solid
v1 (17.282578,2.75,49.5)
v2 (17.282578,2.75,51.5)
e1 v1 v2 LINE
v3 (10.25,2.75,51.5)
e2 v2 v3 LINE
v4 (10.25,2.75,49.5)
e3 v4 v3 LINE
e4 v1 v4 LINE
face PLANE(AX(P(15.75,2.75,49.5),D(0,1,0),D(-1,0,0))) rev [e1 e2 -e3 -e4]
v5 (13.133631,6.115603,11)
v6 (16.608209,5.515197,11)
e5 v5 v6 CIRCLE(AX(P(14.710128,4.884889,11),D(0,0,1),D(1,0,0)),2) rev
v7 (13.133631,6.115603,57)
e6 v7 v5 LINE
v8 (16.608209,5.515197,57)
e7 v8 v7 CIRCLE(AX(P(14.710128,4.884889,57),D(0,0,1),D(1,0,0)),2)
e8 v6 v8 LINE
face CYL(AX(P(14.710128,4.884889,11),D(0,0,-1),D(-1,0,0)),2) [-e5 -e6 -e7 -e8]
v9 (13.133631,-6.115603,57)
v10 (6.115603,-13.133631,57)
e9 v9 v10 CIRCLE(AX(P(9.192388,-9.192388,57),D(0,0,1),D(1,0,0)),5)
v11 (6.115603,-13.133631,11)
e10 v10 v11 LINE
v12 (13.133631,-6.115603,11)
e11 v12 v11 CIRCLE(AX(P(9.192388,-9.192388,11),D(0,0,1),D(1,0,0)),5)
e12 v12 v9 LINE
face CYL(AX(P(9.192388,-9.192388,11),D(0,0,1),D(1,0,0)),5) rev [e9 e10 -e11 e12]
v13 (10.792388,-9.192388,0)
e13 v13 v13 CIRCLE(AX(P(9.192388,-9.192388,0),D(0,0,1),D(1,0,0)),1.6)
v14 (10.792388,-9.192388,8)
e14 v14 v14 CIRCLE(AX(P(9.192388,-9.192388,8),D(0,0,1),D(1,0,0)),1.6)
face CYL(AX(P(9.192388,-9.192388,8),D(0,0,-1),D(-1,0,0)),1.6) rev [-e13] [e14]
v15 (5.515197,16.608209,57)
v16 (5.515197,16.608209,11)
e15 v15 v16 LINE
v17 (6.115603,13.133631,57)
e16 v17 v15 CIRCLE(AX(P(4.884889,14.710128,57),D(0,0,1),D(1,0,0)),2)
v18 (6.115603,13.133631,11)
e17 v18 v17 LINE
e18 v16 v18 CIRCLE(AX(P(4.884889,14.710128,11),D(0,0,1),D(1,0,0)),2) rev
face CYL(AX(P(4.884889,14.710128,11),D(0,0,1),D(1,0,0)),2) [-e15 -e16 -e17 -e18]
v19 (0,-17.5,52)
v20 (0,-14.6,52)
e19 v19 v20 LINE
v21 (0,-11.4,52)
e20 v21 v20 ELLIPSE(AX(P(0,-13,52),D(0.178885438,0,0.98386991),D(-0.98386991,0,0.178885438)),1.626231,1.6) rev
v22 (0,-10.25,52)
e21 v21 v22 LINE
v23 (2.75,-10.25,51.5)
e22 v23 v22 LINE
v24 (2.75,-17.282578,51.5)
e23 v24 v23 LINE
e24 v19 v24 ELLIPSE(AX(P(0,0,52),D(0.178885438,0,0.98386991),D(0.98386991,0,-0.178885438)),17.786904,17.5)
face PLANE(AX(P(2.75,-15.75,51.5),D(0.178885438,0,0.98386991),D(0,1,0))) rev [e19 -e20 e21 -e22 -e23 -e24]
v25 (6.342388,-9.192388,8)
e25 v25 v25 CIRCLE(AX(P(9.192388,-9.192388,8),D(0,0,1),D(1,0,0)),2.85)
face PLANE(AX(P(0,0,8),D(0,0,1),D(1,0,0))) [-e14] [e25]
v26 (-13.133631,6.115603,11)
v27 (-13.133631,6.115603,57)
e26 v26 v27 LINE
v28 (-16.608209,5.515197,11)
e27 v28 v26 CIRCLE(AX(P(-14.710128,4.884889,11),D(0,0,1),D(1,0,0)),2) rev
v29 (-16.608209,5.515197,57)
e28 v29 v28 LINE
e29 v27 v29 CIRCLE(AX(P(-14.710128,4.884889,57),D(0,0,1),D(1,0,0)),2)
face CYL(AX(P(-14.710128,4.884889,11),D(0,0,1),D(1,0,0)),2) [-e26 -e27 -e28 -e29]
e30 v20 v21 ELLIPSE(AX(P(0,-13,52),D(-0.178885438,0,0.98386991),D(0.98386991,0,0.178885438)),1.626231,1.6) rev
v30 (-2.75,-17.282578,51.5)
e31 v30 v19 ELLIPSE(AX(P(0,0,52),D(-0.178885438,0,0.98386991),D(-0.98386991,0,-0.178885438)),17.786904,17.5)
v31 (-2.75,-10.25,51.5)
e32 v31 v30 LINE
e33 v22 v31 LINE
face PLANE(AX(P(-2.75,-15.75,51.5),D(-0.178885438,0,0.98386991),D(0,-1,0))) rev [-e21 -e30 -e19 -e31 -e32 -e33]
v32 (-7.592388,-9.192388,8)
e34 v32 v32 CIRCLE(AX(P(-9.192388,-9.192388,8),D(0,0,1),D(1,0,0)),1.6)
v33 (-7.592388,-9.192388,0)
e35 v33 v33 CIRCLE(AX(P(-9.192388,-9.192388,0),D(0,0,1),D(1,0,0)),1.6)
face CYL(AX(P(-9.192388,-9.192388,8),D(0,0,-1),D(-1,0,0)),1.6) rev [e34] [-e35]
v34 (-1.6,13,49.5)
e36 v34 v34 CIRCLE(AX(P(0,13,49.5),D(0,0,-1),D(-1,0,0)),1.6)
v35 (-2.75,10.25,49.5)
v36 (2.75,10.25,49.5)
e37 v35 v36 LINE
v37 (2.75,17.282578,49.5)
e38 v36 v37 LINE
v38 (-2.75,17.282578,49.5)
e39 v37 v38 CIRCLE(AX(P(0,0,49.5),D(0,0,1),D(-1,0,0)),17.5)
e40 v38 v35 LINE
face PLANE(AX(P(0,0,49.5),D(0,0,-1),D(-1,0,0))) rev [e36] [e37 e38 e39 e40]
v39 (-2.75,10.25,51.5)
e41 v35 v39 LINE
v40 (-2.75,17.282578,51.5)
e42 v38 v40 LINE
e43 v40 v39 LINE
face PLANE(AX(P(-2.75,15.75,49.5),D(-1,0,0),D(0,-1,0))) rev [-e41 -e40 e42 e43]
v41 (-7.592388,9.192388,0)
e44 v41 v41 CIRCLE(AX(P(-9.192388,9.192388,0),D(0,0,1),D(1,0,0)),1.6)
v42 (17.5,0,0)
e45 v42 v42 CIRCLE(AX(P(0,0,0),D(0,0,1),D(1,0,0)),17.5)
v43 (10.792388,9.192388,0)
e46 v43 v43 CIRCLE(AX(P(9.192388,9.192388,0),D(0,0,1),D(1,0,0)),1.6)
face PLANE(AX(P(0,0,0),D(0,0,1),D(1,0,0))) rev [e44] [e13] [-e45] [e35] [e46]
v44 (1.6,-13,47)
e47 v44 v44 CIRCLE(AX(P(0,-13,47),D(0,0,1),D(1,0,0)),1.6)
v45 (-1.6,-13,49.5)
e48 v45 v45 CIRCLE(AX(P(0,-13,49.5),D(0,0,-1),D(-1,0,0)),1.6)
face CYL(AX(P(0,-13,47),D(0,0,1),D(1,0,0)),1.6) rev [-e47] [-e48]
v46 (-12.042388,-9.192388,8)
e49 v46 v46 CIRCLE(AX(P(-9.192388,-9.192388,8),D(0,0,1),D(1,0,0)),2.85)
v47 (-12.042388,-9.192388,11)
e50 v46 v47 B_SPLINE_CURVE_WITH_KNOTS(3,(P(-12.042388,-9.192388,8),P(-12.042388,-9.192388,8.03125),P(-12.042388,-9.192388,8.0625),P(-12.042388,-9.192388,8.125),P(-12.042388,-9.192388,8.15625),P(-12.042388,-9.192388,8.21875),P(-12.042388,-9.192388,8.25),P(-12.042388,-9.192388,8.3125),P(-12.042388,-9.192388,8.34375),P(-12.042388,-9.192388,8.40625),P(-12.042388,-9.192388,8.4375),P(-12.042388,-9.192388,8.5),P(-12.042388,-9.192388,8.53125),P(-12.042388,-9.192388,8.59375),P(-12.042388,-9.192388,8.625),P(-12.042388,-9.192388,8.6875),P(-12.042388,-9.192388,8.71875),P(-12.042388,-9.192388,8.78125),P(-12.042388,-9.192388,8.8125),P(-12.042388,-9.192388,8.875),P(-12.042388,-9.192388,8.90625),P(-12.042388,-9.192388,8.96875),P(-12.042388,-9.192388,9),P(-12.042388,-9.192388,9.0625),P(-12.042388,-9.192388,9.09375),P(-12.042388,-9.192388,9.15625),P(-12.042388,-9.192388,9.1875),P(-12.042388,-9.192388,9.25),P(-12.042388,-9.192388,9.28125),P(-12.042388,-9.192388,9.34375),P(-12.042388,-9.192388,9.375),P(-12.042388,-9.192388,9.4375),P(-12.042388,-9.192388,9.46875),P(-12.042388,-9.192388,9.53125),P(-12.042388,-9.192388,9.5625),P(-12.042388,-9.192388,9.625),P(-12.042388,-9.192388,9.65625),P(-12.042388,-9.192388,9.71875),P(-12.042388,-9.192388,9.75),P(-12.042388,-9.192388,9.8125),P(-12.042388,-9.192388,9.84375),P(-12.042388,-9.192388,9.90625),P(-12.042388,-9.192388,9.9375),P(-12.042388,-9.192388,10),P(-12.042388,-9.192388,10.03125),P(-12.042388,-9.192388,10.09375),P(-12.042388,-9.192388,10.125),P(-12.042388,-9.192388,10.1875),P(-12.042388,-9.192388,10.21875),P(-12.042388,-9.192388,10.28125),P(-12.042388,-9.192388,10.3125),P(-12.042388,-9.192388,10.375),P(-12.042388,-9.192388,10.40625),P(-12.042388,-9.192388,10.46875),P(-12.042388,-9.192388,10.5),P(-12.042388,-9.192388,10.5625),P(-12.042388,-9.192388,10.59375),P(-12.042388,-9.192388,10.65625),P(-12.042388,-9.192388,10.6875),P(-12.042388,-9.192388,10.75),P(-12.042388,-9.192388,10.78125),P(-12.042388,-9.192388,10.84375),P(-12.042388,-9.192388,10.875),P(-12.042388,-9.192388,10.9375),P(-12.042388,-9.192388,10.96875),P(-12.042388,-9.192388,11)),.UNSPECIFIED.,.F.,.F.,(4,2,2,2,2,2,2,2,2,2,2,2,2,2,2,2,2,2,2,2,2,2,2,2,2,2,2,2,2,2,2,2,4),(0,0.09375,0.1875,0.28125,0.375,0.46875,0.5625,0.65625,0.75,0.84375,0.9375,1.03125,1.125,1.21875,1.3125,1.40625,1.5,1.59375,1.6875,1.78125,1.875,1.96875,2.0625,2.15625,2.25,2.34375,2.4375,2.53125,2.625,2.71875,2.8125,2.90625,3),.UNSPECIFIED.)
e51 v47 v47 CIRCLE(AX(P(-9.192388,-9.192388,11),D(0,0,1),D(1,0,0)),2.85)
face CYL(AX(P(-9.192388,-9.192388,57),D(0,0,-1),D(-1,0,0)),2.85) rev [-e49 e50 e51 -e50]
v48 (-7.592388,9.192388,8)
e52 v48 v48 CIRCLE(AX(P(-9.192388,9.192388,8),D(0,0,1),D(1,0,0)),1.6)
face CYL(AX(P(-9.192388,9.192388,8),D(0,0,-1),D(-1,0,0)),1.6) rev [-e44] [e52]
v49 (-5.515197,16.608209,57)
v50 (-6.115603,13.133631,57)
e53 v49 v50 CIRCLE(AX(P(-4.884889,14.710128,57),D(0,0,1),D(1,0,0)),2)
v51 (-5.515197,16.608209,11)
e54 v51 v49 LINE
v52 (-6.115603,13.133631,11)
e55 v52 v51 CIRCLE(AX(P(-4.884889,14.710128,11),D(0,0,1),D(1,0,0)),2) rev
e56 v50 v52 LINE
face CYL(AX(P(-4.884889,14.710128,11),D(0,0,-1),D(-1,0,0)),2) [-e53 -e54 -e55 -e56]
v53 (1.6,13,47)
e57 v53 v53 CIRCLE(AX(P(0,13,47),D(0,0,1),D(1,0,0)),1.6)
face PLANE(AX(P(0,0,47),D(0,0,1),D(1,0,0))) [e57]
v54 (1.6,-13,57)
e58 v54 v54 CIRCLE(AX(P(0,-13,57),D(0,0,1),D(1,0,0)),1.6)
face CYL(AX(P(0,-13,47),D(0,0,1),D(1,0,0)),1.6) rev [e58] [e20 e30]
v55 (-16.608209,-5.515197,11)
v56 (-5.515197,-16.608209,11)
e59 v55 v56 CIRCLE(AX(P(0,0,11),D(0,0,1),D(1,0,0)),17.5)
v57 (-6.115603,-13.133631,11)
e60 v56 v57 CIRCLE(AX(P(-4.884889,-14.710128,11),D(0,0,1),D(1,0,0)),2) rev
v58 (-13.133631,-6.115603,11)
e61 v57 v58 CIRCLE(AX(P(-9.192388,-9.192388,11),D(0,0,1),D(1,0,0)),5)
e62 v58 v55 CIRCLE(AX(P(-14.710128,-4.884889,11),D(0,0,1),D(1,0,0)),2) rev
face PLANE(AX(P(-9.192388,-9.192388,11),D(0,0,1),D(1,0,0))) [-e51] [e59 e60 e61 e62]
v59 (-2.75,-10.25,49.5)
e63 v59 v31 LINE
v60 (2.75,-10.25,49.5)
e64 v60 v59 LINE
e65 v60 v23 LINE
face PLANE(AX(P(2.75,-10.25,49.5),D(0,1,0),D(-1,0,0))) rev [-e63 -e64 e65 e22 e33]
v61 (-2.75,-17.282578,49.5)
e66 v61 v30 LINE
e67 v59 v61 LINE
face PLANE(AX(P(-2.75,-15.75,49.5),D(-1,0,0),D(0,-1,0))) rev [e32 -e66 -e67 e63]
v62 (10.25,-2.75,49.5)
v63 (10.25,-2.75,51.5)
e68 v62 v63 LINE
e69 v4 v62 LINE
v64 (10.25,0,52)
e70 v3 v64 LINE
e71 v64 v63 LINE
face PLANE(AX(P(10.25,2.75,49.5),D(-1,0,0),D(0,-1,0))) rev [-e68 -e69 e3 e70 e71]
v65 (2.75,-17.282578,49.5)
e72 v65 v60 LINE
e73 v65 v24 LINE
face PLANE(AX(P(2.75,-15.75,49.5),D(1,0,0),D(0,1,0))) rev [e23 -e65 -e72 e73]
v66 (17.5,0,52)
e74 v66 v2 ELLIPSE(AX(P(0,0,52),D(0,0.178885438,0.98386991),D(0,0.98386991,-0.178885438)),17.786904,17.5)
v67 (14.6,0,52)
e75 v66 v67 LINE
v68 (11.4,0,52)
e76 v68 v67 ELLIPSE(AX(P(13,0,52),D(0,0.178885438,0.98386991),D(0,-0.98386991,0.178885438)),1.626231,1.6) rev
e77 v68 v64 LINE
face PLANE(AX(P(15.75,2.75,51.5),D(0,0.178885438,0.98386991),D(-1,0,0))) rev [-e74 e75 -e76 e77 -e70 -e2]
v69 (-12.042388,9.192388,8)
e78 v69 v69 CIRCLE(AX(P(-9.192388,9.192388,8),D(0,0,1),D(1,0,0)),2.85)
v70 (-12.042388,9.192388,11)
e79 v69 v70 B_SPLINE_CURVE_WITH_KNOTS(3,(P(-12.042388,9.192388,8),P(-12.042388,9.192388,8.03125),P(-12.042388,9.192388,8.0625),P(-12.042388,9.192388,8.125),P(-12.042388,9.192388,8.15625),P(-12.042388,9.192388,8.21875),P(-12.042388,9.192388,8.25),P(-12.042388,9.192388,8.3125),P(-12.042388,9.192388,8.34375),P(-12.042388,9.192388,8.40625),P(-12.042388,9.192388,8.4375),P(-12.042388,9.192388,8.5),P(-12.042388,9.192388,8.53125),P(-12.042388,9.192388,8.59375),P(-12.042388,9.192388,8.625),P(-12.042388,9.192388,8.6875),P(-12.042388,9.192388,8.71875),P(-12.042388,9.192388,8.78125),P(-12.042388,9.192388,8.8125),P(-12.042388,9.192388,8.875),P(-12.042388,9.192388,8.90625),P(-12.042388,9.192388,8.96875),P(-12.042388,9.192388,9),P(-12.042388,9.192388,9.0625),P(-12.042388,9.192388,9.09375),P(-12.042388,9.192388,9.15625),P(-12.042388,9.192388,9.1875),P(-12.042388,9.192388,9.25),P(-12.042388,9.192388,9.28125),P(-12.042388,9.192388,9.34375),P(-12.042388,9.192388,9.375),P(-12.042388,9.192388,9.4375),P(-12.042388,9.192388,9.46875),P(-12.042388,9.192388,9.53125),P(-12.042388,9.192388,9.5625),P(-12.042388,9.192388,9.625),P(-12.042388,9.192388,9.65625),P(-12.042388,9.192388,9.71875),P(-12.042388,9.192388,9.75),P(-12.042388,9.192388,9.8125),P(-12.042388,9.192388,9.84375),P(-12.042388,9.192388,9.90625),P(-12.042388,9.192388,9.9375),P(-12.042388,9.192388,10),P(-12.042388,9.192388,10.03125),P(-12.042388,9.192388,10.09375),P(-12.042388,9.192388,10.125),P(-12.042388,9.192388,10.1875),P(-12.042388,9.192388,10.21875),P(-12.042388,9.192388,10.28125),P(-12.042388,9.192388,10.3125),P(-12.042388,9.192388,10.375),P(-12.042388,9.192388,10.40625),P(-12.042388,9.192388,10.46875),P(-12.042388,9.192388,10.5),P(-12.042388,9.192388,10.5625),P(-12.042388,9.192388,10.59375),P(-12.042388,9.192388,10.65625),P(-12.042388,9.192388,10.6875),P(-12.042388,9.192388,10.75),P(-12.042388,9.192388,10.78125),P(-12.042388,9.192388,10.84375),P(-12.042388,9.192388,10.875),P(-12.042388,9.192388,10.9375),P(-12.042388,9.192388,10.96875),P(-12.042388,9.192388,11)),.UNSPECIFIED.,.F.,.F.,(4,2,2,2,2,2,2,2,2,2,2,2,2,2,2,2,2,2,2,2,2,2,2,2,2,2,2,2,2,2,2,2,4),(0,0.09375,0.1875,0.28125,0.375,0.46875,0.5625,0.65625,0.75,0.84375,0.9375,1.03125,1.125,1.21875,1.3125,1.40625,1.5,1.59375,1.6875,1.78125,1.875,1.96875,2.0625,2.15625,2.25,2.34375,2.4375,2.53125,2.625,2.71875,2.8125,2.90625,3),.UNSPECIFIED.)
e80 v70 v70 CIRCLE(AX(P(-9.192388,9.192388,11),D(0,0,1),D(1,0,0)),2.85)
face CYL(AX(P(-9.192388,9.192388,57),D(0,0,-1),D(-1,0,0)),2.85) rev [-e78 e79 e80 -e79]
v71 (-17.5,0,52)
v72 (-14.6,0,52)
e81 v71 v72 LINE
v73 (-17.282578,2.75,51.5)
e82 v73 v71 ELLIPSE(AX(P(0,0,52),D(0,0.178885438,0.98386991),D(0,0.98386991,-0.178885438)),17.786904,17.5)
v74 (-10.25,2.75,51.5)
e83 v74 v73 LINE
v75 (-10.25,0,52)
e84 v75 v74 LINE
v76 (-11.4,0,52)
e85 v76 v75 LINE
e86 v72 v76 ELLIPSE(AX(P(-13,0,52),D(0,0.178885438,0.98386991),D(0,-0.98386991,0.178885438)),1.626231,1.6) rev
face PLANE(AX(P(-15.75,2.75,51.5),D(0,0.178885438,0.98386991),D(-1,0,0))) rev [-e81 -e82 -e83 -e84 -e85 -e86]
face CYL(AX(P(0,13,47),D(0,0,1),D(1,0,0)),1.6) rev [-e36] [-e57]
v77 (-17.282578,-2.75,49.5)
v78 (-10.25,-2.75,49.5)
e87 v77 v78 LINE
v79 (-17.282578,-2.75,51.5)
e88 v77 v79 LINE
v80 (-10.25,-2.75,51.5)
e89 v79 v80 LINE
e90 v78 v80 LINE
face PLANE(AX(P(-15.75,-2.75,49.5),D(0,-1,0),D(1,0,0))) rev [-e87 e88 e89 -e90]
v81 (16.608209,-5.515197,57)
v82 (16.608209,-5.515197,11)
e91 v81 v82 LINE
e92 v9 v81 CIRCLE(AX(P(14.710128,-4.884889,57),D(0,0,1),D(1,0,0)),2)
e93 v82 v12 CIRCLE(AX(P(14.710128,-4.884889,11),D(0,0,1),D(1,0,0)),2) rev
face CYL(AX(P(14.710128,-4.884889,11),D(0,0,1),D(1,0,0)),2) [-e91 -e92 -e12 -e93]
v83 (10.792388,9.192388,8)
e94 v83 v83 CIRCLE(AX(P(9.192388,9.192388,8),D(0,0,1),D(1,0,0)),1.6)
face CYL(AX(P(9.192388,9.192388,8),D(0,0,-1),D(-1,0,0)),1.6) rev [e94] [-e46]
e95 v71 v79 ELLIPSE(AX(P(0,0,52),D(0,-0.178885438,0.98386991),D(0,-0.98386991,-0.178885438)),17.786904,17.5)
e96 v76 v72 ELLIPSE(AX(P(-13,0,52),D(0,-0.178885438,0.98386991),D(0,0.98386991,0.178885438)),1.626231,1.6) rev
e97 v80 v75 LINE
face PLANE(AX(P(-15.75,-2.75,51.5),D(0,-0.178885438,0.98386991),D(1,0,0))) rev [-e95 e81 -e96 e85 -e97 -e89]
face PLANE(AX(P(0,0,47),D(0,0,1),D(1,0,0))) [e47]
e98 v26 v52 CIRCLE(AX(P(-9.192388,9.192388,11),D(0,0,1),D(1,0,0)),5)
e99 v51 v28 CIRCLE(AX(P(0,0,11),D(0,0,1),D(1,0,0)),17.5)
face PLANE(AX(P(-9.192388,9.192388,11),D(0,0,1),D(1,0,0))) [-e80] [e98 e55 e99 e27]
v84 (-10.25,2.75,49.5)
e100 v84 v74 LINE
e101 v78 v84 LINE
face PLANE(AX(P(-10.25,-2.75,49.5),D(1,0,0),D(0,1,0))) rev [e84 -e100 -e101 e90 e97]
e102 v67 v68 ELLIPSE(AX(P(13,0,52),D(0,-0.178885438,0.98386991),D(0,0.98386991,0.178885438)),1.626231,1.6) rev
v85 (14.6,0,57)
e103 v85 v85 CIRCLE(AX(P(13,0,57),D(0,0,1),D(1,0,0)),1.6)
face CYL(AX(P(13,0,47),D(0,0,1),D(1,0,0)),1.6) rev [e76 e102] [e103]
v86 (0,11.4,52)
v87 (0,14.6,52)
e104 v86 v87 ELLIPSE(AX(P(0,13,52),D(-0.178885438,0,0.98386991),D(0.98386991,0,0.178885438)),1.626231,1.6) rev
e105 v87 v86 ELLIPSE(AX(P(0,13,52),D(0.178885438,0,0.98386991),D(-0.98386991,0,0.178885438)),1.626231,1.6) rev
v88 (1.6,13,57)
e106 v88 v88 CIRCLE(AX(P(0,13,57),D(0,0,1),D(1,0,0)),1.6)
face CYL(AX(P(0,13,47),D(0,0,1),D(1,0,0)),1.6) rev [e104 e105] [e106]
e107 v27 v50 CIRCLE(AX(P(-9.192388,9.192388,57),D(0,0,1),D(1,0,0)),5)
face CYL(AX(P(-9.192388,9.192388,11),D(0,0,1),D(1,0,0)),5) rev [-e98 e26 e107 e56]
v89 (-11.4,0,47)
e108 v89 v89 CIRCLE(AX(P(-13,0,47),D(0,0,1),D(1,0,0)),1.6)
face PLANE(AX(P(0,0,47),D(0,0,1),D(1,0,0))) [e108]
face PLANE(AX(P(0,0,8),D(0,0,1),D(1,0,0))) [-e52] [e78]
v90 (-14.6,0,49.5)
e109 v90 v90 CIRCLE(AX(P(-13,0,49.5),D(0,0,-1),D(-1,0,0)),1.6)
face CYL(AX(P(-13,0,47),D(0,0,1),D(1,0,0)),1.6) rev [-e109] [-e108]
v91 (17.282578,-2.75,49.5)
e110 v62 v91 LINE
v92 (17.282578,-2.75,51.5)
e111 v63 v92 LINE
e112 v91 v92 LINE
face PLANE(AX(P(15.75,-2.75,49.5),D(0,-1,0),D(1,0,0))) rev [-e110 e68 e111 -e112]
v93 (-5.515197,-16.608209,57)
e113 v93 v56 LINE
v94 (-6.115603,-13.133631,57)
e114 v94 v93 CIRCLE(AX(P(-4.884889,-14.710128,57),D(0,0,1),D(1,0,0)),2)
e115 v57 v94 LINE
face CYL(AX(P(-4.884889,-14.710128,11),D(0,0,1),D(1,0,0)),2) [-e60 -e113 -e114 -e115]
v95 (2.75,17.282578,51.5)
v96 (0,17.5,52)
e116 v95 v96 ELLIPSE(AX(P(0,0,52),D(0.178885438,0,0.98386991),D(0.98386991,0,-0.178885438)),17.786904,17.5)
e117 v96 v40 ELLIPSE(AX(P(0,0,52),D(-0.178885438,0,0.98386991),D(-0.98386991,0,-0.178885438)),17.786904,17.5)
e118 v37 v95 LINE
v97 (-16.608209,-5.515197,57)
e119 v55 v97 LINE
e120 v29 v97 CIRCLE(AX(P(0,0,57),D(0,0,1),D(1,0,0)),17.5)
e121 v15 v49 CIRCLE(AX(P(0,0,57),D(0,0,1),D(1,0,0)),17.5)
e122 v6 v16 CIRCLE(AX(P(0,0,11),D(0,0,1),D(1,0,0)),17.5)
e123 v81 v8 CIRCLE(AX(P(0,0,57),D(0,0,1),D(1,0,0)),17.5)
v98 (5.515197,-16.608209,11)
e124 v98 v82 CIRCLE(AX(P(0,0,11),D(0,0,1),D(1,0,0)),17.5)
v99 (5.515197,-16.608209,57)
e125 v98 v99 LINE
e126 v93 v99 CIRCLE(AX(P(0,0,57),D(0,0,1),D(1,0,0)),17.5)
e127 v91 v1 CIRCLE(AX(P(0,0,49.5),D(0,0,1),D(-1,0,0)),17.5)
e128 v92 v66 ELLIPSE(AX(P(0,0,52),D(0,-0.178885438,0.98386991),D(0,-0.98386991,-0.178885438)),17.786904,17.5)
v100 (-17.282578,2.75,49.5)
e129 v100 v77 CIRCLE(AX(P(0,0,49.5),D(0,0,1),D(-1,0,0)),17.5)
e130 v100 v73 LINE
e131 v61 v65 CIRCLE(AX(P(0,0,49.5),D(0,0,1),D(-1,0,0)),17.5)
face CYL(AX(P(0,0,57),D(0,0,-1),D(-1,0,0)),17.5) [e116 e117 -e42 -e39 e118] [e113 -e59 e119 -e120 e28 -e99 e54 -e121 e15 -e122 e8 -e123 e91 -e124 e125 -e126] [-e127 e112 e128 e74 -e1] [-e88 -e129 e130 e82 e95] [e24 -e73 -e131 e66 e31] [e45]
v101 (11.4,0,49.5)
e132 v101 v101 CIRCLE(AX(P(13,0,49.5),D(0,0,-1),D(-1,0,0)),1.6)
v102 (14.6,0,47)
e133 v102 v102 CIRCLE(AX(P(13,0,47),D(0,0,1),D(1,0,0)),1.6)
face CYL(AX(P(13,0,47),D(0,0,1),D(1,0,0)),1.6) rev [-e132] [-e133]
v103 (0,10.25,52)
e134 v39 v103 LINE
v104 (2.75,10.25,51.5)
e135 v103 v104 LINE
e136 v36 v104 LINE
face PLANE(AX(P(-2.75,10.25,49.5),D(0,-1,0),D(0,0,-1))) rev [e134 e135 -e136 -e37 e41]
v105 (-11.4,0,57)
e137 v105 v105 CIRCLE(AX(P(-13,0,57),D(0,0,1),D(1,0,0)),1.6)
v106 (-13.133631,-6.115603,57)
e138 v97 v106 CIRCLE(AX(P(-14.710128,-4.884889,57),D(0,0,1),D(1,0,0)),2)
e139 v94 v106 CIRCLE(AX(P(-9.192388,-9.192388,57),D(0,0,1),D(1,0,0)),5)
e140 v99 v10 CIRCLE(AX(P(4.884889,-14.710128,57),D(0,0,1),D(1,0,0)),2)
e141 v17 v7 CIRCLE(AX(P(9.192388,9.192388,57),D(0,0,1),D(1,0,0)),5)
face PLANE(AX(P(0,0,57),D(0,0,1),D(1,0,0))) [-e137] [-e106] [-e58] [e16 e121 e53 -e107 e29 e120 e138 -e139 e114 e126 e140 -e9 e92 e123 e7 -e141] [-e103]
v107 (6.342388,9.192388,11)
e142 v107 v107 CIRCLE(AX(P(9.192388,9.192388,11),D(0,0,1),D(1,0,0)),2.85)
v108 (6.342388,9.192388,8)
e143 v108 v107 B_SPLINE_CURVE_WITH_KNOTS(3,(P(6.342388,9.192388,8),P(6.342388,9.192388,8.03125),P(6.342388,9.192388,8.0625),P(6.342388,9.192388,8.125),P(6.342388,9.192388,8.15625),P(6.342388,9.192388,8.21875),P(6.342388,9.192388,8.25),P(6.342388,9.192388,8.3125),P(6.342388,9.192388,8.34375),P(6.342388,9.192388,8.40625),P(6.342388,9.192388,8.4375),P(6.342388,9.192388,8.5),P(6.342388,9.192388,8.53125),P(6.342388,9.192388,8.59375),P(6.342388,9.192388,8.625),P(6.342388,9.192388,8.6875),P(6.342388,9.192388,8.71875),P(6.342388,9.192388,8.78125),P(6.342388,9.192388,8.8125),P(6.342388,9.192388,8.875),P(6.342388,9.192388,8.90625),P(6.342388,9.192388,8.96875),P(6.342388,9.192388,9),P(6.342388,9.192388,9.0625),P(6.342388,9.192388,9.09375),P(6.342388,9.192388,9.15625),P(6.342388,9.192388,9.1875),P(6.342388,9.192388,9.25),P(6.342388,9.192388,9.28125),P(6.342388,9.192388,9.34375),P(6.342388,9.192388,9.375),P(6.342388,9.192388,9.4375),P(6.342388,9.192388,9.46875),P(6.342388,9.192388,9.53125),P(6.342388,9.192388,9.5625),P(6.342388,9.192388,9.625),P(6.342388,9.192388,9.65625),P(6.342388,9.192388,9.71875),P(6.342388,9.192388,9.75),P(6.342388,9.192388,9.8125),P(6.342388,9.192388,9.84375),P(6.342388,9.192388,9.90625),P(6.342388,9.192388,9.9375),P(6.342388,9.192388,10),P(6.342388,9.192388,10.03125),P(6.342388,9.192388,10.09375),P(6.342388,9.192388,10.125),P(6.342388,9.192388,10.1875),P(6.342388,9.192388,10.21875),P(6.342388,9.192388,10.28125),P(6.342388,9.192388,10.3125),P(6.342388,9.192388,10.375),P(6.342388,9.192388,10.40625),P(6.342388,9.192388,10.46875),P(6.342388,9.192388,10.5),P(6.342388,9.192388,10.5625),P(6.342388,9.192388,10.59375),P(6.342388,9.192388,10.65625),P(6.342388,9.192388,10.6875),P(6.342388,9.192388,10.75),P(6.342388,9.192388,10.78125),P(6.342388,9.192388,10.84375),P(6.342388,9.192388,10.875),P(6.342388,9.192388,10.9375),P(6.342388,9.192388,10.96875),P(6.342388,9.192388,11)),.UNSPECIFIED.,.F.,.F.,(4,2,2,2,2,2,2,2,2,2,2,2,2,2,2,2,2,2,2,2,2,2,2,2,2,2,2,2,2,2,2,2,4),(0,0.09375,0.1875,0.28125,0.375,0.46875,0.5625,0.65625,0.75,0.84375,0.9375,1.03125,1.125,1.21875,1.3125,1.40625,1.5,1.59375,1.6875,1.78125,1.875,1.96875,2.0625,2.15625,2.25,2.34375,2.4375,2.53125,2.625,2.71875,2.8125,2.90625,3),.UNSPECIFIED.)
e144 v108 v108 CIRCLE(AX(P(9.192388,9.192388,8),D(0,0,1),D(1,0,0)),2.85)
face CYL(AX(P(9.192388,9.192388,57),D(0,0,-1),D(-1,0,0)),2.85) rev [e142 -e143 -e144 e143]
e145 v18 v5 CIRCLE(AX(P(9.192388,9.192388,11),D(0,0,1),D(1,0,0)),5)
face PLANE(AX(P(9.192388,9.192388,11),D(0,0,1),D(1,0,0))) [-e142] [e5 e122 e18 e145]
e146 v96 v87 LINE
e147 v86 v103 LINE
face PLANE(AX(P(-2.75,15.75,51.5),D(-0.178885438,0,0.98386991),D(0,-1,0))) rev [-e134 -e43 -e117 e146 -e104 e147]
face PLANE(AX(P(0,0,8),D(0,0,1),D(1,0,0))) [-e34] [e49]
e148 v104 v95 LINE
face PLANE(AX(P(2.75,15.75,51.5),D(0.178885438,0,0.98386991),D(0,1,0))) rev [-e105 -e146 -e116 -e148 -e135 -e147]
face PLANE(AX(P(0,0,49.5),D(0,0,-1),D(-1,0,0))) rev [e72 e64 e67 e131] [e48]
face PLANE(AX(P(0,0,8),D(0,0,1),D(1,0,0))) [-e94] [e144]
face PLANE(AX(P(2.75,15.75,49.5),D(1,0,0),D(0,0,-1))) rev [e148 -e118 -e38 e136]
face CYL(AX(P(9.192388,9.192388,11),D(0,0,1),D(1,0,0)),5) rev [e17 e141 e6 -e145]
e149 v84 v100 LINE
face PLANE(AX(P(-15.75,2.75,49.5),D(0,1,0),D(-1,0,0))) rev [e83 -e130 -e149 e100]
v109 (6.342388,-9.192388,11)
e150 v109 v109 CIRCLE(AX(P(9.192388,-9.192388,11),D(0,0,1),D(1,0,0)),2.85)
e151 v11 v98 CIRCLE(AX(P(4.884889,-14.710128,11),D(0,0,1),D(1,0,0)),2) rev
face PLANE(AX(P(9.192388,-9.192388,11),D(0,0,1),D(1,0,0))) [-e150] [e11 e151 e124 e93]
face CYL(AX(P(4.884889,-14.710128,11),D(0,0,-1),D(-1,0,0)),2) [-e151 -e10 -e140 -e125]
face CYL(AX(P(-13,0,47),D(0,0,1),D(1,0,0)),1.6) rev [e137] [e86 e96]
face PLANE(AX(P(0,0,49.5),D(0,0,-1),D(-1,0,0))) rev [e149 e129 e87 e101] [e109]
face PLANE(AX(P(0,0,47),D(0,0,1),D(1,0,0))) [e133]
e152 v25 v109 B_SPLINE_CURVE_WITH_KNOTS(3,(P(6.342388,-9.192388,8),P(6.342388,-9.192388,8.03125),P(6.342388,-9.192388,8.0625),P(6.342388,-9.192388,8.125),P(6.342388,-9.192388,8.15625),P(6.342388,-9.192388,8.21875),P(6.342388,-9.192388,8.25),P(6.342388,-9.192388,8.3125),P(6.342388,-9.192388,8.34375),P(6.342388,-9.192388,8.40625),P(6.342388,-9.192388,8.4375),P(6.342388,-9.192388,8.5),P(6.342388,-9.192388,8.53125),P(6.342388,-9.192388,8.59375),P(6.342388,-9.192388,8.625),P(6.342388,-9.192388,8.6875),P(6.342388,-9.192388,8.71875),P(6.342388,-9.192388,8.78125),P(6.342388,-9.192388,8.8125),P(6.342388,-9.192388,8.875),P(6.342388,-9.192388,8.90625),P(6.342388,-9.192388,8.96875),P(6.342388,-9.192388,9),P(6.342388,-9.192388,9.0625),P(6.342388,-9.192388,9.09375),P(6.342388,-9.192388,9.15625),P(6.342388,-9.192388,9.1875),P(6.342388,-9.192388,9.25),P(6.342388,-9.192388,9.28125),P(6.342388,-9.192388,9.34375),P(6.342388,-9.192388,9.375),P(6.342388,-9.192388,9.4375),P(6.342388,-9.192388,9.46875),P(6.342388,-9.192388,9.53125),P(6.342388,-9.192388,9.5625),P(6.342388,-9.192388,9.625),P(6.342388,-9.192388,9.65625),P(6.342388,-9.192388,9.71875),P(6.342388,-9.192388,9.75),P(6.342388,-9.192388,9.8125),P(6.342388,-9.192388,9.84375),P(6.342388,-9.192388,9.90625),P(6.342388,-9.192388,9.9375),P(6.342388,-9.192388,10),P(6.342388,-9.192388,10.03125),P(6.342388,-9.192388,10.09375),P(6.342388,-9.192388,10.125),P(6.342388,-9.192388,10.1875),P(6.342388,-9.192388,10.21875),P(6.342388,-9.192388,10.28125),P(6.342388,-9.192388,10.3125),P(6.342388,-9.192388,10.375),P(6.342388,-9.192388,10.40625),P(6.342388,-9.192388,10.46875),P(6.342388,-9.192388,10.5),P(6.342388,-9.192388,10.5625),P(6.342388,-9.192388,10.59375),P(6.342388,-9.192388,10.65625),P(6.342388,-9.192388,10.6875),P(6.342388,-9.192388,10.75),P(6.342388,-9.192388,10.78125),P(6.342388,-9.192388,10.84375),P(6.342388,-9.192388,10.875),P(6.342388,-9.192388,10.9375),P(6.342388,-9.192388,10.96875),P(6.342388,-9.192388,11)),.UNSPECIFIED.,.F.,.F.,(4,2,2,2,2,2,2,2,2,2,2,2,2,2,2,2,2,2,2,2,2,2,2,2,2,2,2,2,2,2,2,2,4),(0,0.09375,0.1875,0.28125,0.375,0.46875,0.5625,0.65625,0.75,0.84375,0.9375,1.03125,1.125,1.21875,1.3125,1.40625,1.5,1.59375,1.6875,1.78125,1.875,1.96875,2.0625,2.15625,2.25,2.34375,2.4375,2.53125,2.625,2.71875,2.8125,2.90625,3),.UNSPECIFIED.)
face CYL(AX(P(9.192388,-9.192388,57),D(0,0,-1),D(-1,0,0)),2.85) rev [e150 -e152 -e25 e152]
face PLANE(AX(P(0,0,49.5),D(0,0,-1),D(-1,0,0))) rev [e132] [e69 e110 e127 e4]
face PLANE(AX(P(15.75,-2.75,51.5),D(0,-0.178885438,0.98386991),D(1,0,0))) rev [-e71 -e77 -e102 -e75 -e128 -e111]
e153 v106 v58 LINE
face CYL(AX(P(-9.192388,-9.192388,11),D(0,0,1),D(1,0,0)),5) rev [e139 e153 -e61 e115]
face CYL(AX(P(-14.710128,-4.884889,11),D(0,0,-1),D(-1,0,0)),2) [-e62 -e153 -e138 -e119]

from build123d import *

# Parameters (mm, degrees)
SKETCH1_R           = 17.5
SKETCH1_R_2         = 2.85
BOSS_EXTRUDE1_DEPTH = 57
SKETCH1_3_R         = 2.85
SKETCH1_3_R_2       = 1.6
BOSS_EXTRUDE2_DEPTH = 8
SKETCH2_R           = 5
CUT_EXTRUDE1_DEPTH  = 46
FILLET1_R           = 2
CUT_EXTRUDE2_START  = -7.5
SKETCH3_R           = 1.6
CUT_EXTRUDE2_DEPTH  = 2.5
CUT_EXTRUDE3_START  = -10
SKETCH3_2_R         = 1.6
CUT_EXTRUDE3_DEPTH  = 10
CHAMFER1_SIZE       = 2.75
CHAMFER1_SIZE_2     = 0.5


with BuildPart() as part:
    # Sketch1 → Boss-Extrude1 (new body)
    with BuildSketch(Plane(origin=(0, 0, 0), x_dir=(0, 1, 0), z_dir=(0, 0, 1))):
        with Locations(Location((0, 0, 0), (0, 0, 90))):
            Circle(SKETCH1_R)
        with Locations(Location((-9.192388155, 9.192388155, 0), (0, 0, 90))):
            Circle(SKETCH1_R_2, mode=Mode.SUBTRACT)
        with Locations(Location((-9.192388155, -9.192388155, 0), (0, 0, 90))):
            Circle(SKETCH1_R_2, mode=Mode.SUBTRACT)
        with Locations(Location((9.192388155, -9.192388155, 0), (0, 0, 90))):
            Circle(SKETCH1_R_2, mode=Mode.SUBTRACT)
        with Locations(Location((9.192388155, 9.192388155, 0), (0, 0, 90))):
            Circle(SKETCH1_R_2, mode=Mode.SUBTRACT)
    extrude(amount=BOSS_EXTRUDE1_DEPTH)

    # Sketch1<3> → Boss-Extrude2 (add)
    # profile 1 of 4: a face of its own
    with BuildSketch(Plane(origin=(0, 0, 0), x_dir=(0, 1, 0), z_dir=(0, 0, 1))):
        with Locations(Location((-9.192388155, -9.192388155, 0), (0, 0, 90))):
            Circle(SKETCH1_3_R)
        with Locations(Location((-9.192388155, -9.192388155, 0), (0, 0, 270))):
            Circle(SKETCH1_3_R_2, mode=Mode.SUBTRACT)
    # profile 2 of 4: a face of its own
    with BuildSketch(Plane(origin=(0, 0, 0), x_dir=(0, 1, 0), z_dir=(0, 0, 1))):
        with Locations(Location((-9.192388155, 9.192388155, 0), (0, 0, 90))):
            Circle(SKETCH1_3_R)
        with Locations(Location((-9.192388155, 9.192388155, 0), (0, 0, 270))):
            Circle(SKETCH1_3_R_2, mode=Mode.SUBTRACT)
    # profile 3 of 4: a face of its own
    with BuildSketch(Plane(origin=(0, 0, 0), x_dir=(0, 1, 0), z_dir=(0, 0, 1))):
        with Locations(Location((9.192388155, -9.192388155, 0), (0, 0, 90))):
            Circle(SKETCH1_3_R)
        with Locations(Location((9.192388155, -9.192388155, 0), (0, 0, 270))):
            Circle(SKETCH1_3_R_2, mode=Mode.SUBTRACT)
    # profile 4 of 4: a face of its own
    with BuildSketch(Plane(origin=(0, 0, 0), x_dir=(0, 1, 0), z_dir=(0, 0, 1))):
        with Locations(Location((9.192388155, 9.192388155, 0), (0, 0, 90))):
            Circle(SKETCH1_3_R)
        with Locations(Location((9.192388155, 9.192388155, 0), (0, 0, 270))):
            Circle(SKETCH1_3_R_2, mode=Mode.SUBTRACT)
    extrude(amount=BOSS_EXTRUDE2_DEPTH)

    # Sketch2 → Cut-Extrude1 (cut)
    with BuildSketch(Plane.XY.offset(57)):
        with Locations((-9.192388155, 9.192388155)):
            Circle(SKETCH2_R)
        with Locations((9.192388155, 9.192388155)):
            Circle(SKETCH2_R)
        with Locations((9.192388155, -9.192388155)):
            Circle(SKETCH2_R)
        with Locations((-9.192388155, -9.192388155)):
            Circle(SKETCH2_R)
    extrude(amount=-CUT_EXTRUDE1_DEPTH, mode=Mode.SUBTRACT)

    # Fillet1
    fillet1_edges = [part.edges().sort_by_distance(p)[0] for p in [
        (-14.028560913, -10.46181049, 34),
        (-10.46181049, -14.028560913, 34),
        (10.46181049, -14.028560913, 34),
        (14.028560913, -10.46181049, 34),
        (14.028560913, 10.46181049, 34),
        (10.46181049, 14.028560913, 34),
        (-10.46181049, 14.028560913, 34),
        (-14.028560913, 10.46181049, 34),
    ]]
    fillet(fillet1_edges, radius=FILLET1_R)

    # Sketch3 → Cut-Extrude2 (cut)
    # profile 1 of 4: a face of its own
    with BuildSketch(Plane.XY.offset(57).offset(CUT_EXTRUDE2_START)):
        with BuildLine():
            Line((-2.75, 15.75), (-2.75, 17.282577933))
            ThreePointArc((-2.75, 17.282577933), (0, 17.5), (2.75, 17.282577933))
            Line((2.75, 17.282577933), (2.75, 15.75))
            Line((2.75, 15.75), (2.75, 10.25))
            Line((2.75, 10.25), (-2.75, 10.25))
            Line((-2.75, 10.25), (-2.75, 15.75))
        make_face()
        with Locations((0, 13)):
            Circle(SKETCH3_R, mode=Mode.SUBTRACT)
    # profile 2 of 4: a face of its own
    with BuildSketch(Plane.XY.offset(57).offset(CUT_EXTRUDE2_START)):
        with BuildLine():
            Line((15.75, -2.75), (10.25, -2.75))
            Line((10.25, -2.75), (10.25, 2.75))
            Line((10.25, 2.75), (15.75, 2.75))
            Line((15.75, 2.75), (17.282577933, 2.75))
            ThreePointArc((17.282577933, 2.75), (17.5, 0), (17.282577933, -2.75))
            Line((17.282577933, -2.75), (15.75, -2.75))
        make_face()
        with Locations((13, 0)):
            Circle(SKETCH3_R, mode=Mode.SUBTRACT)
    # profile 3 of 4: a face of its own
    with BuildSketch(Plane.XY.offset(57).offset(CUT_EXTRUDE2_START)):
        with BuildLine():
            Line((-2.75, -15.75), (-2.75, -10.25))
            Line((-2.75, -10.25), (2.75, -10.25))
            Line((2.75, -10.25), (2.75, -15.75))
            Line((2.75, -15.75), (2.75, -17.282577933))
            ThreePointArc((2.75, -17.282577933), (0, -17.5), (-2.75, -17.282577933))
            Line((-2.75, -17.282577933), (-2.75, -15.75))
        make_face()
        with Locations((0, -13)):
            Circle(SKETCH3_R, mode=Mode.SUBTRACT)
    # profile 4 of 4: a face of its own
    with BuildSketch(Plane.XY.offset(57).offset(CUT_EXTRUDE2_START)):
        with BuildLine():
            Line((-15.75, 2.75), (-10.25, 2.75))
            Line((-10.25, 2.75), (-10.25, -2.75))
            Line((-10.25, -2.75), (-15.75, -2.75))
            Line((-15.75, -2.75), (-17.282577933, -2.75))
            ThreePointArc((-17.282577933, -2.75), (-17.5, 0), (-17.282577933, 2.75))
            Line((-17.282577933, 2.75), (-15.75, 2.75))
        make_face()
        with Locations((-13, 0)):
            Circle(SKETCH3_R, mode=Mode.SUBTRACT)
    extrude(amount=CUT_EXTRUDE2_DEPTH, mode=Mode.SUBTRACT)

    # Sketch3<2> → Cut-Extrude3 (cut)
    with BuildSketch(Plane.XY.offset(57).offset(CUT_EXTRUDE3_START)):
        with Locations((-13, 0)):
            Circle(SKETCH3_2_R)
        with Locations((0, 13)):
            Circle(SKETCH3_2_R)
        with Locations((13, 0)):
            Circle(SKETCH3_2_R)
        with Locations((0, -13)):
            Circle(SKETCH3_2_R)
    extrude(amount=CUT_EXTRUDE3_DEPTH, mode=Mode.SUBTRACT)

    # Chamfer1
    # the kernel refuses this chamfer: 2.75, 0.5 mm, written as the material it adds along each edge
    with BuildSketch(Plane(origin=(-3.104266441, -2.75, 52), x_dir=(1.0355932807417332e-14, 0.9999763028084744, 0.006884317068104265), z_dir=(-1, 0, 0))) as chamfer1_piece_1_section:
        Polygon((CHAMFER1_SIZE * 0.999976302808, CHAMFER1_SIZE * 0.0068843170681), (-CHAMFER1_SIZE_2 * 0.0068843170681, CHAMFER1_SIZE_2 * 0.999976302808), (0, 0), align=None)
    chamfer1_piece_1 = extrude(amount=21.324045051, mode=Mode.PRIVATE)
    chamfer1_piece_1 = chamfer1_piece_1 & Plane(origin=(0, 0, 51.863927103), x_dir=(-1, 0, 0), z_dir=(0, 0, -1)) * Cylinder(17.5, 54, mode=Mode.PRIVATE)
    chamfer1_piece_1 = chamfer1_piece_1 - Plane(origin=(-13, 0, 51.863927103), x_dir=(1, 0, 0), z_dir=(0, 0, -1)) * Cylinder(1.6, 54, mode=Mode.PRIVATE)
    add(chamfer1_piece_1)
    with BuildSketch(Plane(origin=(-24.428311492, 2.75, 52), x_dir=(-1.048222467092242e-14, -0.9999763028084744, 0.006884317068104265), z_dir=(1, 0, 0))) as chamfer1_piece_2_section:
        Polygon((CHAMFER1_SIZE * 0.999976302808, CHAMFER1_SIZE * 0.0068843170681), (-CHAMFER1_SIZE_2 * 0.0068843170681, CHAMFER1_SIZE_2 * 0.999976302808), (0, 0), align=None)
    chamfer1_piece_2 = extrude(amount=21.324045051, mode=Mode.PRIVATE)
    chamfer1_piece_2 = chamfer1_piece_2 & Plane(origin=(0, 0, 51.852070579), x_dir=(-1, 0, 0), z_dir=(0, 0, -1)) * Cylinder(17.5, 54, mode=Mode.PRIVATE)
    chamfer1_piece_2 = chamfer1_piece_2 - Plane(origin=(-13, 0, 51.852070579), x_dir=(1, 0, 0), z_dir=(0, 0, -1)) * Cylinder(1.6, 54, mode=Mode.PRIVATE)
    add(chamfer1_piece_2)
    with BuildSketch(Plane(origin=(-2.75, 3.104266441, 52), x_dir=(0.9999763028084744, 0, 0.006884317068104265), z_dir=(0, 1, 0))) as chamfer1_piece_3_section:
        Polygon((CHAMFER1_SIZE * 0.999976302808, CHAMFER1_SIZE * 0.0068843170681), (-CHAMFER1_SIZE_2 * 0.0068843170681, CHAMFER1_SIZE_2 * 0.999976302808), (0, 0), align=None)
    chamfer1_piece_3 = extrude(amount=21.324045051, mode=Mode.PRIVATE)
    chamfer1_piece_3 = chamfer1_piece_3 & Plane(origin=(0, 0, 51.863927103), x_dir=(-1, 0, 0), z_dir=(0, 0, -1)) * Cylinder(17.5, 54, mode=Mode.PRIVATE)
    chamfer1_piece_3 = chamfer1_piece_3 - Plane(origin=(0, 13, 51.863927103), x_dir=(1, 0, 0), z_dir=(0, 0, -1)) * Cylinder(1.6, 54, mode=Mode.PRIVATE)
    add(chamfer1_piece_3)
    with BuildSketch(Plane(origin=(2.75, 24.428311492, 52), x_dir=(0.20388124945923355, 0, -0.9789956262001082), z_dir=(0, -1, 0))) as chamfer1_piece_4_section:
        Polygon((CHAMFER1_SIZE_2 * 0.9789956262, -CHAMFER1_SIZE_2 * 0.203881249459), (-CHAMFER1_SIZE * 0.203881249459, -CHAMFER1_SIZE * 0.9789956262), (0, 0), align=None)
    chamfer1_piece_4 = extrude(amount=21.324045051, mode=Mode.PRIVATE)
    chamfer1_piece_4 = chamfer1_piece_4 & Plane(origin=(0, 0, 51.852070749), x_dir=(-1, 0, 0), z_dir=(0, 0, -1)) * Cylinder(17.5, 54, mode=Mode.PRIVATE)
    chamfer1_piece_4 = chamfer1_piece_4 - Plane(origin=(0, 13, 51.852070749), x_dir=(1, 0, 0), z_dir=(0, 0, -1)) * Cylinder(1.6, 54, mode=Mode.PRIVATE)
    add(chamfer1_piece_4)
    with BuildSketch(Plane(origin=(3.104266441, 2.75, 52), x_dir=(-3.409880314637416e-15, -0.9999763028084744, 0.006884317068104265), z_dir=(1, 0, 0))) as chamfer1_piece_5_section:
        Polygon((CHAMFER1_SIZE * 0.999976302808, CHAMFER1_SIZE * 0.0068843170681), (-CHAMFER1_SIZE_2 * 0.0068843170681, CHAMFER1_SIZE_2 * 0.999976302808), (0, 0), align=None)
    chamfer1_piece_5 = extrude(amount=21.324045051, mode=Mode.PRIVATE)
    chamfer1_piece_5 = chamfer1_piece_5 & Plane(origin=(0, 0, 51.863927103), x_dir=(-1, 0, 0), z_dir=(0, 0, -1)) * Cylinder(17.5, 54, mode=Mode.PRIVATE)
    chamfer1_piece_5 = chamfer1_piece_5 - Plane(origin=(13, 0, 51.863927103), x_dir=(1, 0, 0), z_dir=(0, 0, -1)) * Cylinder(1.6, 54, mode=Mode.PRIVATE)
    add(chamfer1_piece_5)
    with BuildSketch(Plane(origin=(24.428311492, -2.75, 52), x_dir=(0, -0.20388124945923355, -0.9789956262001082), z_dir=(-1, 0, 0))) as chamfer1_piece_6_section:
        Polygon((CHAMFER1_SIZE_2 * 0.9789956262, -CHAMFER1_SIZE_2 * 0.203881249459), (-CHAMFER1_SIZE * 0.203881249459, -CHAMFER1_SIZE * 0.9789956262), (0, 0), align=None)
    chamfer1_piece_6 = extrude(amount=21.324045051, mode=Mode.PRIVATE)
    chamfer1_piece_6 = chamfer1_piece_6 & Plane(origin=(0, 0, 51.852070888), x_dir=(-1, 0, 0), z_dir=(0, 0, -1)) * Cylinder(17.5, 54, mode=Mode.PRIVATE)
    chamfer1_piece_6 = chamfer1_piece_6 - Plane(origin=(13, 0, 51.852070888), x_dir=(1, 0, 0), z_dir=(0, 0, -1)) * Cylinder(1.6, 54, mode=Mode.PRIVATE)
    add(chamfer1_piece_6)
    with BuildSketch(Plane(origin=(2.75, -3.104266441, 52), x_dir=(-0.9999763028084744, 6.88290656102737e-15, 0.006884317068104265), z_dir=(0, -1, 0))) as chamfer1_piece_7_section:
        Polygon((CHAMFER1_SIZE * 0.999976302808, CHAMFER1_SIZE * 0.0068843170681), (-CHAMFER1_SIZE_2 * 0.0068843170681, CHAMFER1_SIZE_2 * 0.999976302808), (0, 0), align=None)
    chamfer1_piece_7 = extrude(amount=21.324045051, mode=Mode.PRIVATE)
    chamfer1_piece_7 = chamfer1_piece_7 & Plane(origin=(0, 0, 51.863927103), x_dir=(-1, 0, 0), z_dir=(0, 0, -1)) * Cylinder(17.5, 54, mode=Mode.PRIVATE)
    chamfer1_piece_7 = chamfer1_piece_7 - Plane(origin=(0, -13, 51.863927103), x_dir=(1, 0, 0), z_dir=(0, 0, -1)) * Cylinder(1.6, 54, mode=Mode.PRIVATE)
    add(chamfer1_piece_7)
    with BuildSketch(Plane(origin=(-2.75, -24.428311492, 52), x_dir=(-0.20388124945923355, 1.4290779976363847e-15, -0.9789956262001082), z_dir=(0, 1, 0))) as chamfer1_piece_8_section:
        Polygon((CHAMFER1_SIZE_2 * 0.9789956262, -CHAMFER1_SIZE_2 * 0.203881249459), (-CHAMFER1_SIZE * 0.203881249459, -CHAMFER1_SIZE * 0.9789956262), (0, 0), align=None)
    chamfer1_piece_8 = extrude(amount=21.324045051, mode=Mode.PRIVATE)
    chamfer1_piece_8 = chamfer1_piece_8 & Plane(origin=(0, 0, 51.852070422), x_dir=(-1, 0, 0), z_dir=(0, 0, -1)) * Cylinder(17.5, 54, mode=Mode.PRIVATE)
    chamfer1_piece_8 = chamfer1_piece_8 - Plane(origin=(0, -13, 51.852070422), x_dir=(1, 0, 0), z_dir=(0, 0, -1)) * Cylinder(1.6, 54, mode=Mode.PRIVATE)
    add(chamfer1_piece_8)


solid = part.part
